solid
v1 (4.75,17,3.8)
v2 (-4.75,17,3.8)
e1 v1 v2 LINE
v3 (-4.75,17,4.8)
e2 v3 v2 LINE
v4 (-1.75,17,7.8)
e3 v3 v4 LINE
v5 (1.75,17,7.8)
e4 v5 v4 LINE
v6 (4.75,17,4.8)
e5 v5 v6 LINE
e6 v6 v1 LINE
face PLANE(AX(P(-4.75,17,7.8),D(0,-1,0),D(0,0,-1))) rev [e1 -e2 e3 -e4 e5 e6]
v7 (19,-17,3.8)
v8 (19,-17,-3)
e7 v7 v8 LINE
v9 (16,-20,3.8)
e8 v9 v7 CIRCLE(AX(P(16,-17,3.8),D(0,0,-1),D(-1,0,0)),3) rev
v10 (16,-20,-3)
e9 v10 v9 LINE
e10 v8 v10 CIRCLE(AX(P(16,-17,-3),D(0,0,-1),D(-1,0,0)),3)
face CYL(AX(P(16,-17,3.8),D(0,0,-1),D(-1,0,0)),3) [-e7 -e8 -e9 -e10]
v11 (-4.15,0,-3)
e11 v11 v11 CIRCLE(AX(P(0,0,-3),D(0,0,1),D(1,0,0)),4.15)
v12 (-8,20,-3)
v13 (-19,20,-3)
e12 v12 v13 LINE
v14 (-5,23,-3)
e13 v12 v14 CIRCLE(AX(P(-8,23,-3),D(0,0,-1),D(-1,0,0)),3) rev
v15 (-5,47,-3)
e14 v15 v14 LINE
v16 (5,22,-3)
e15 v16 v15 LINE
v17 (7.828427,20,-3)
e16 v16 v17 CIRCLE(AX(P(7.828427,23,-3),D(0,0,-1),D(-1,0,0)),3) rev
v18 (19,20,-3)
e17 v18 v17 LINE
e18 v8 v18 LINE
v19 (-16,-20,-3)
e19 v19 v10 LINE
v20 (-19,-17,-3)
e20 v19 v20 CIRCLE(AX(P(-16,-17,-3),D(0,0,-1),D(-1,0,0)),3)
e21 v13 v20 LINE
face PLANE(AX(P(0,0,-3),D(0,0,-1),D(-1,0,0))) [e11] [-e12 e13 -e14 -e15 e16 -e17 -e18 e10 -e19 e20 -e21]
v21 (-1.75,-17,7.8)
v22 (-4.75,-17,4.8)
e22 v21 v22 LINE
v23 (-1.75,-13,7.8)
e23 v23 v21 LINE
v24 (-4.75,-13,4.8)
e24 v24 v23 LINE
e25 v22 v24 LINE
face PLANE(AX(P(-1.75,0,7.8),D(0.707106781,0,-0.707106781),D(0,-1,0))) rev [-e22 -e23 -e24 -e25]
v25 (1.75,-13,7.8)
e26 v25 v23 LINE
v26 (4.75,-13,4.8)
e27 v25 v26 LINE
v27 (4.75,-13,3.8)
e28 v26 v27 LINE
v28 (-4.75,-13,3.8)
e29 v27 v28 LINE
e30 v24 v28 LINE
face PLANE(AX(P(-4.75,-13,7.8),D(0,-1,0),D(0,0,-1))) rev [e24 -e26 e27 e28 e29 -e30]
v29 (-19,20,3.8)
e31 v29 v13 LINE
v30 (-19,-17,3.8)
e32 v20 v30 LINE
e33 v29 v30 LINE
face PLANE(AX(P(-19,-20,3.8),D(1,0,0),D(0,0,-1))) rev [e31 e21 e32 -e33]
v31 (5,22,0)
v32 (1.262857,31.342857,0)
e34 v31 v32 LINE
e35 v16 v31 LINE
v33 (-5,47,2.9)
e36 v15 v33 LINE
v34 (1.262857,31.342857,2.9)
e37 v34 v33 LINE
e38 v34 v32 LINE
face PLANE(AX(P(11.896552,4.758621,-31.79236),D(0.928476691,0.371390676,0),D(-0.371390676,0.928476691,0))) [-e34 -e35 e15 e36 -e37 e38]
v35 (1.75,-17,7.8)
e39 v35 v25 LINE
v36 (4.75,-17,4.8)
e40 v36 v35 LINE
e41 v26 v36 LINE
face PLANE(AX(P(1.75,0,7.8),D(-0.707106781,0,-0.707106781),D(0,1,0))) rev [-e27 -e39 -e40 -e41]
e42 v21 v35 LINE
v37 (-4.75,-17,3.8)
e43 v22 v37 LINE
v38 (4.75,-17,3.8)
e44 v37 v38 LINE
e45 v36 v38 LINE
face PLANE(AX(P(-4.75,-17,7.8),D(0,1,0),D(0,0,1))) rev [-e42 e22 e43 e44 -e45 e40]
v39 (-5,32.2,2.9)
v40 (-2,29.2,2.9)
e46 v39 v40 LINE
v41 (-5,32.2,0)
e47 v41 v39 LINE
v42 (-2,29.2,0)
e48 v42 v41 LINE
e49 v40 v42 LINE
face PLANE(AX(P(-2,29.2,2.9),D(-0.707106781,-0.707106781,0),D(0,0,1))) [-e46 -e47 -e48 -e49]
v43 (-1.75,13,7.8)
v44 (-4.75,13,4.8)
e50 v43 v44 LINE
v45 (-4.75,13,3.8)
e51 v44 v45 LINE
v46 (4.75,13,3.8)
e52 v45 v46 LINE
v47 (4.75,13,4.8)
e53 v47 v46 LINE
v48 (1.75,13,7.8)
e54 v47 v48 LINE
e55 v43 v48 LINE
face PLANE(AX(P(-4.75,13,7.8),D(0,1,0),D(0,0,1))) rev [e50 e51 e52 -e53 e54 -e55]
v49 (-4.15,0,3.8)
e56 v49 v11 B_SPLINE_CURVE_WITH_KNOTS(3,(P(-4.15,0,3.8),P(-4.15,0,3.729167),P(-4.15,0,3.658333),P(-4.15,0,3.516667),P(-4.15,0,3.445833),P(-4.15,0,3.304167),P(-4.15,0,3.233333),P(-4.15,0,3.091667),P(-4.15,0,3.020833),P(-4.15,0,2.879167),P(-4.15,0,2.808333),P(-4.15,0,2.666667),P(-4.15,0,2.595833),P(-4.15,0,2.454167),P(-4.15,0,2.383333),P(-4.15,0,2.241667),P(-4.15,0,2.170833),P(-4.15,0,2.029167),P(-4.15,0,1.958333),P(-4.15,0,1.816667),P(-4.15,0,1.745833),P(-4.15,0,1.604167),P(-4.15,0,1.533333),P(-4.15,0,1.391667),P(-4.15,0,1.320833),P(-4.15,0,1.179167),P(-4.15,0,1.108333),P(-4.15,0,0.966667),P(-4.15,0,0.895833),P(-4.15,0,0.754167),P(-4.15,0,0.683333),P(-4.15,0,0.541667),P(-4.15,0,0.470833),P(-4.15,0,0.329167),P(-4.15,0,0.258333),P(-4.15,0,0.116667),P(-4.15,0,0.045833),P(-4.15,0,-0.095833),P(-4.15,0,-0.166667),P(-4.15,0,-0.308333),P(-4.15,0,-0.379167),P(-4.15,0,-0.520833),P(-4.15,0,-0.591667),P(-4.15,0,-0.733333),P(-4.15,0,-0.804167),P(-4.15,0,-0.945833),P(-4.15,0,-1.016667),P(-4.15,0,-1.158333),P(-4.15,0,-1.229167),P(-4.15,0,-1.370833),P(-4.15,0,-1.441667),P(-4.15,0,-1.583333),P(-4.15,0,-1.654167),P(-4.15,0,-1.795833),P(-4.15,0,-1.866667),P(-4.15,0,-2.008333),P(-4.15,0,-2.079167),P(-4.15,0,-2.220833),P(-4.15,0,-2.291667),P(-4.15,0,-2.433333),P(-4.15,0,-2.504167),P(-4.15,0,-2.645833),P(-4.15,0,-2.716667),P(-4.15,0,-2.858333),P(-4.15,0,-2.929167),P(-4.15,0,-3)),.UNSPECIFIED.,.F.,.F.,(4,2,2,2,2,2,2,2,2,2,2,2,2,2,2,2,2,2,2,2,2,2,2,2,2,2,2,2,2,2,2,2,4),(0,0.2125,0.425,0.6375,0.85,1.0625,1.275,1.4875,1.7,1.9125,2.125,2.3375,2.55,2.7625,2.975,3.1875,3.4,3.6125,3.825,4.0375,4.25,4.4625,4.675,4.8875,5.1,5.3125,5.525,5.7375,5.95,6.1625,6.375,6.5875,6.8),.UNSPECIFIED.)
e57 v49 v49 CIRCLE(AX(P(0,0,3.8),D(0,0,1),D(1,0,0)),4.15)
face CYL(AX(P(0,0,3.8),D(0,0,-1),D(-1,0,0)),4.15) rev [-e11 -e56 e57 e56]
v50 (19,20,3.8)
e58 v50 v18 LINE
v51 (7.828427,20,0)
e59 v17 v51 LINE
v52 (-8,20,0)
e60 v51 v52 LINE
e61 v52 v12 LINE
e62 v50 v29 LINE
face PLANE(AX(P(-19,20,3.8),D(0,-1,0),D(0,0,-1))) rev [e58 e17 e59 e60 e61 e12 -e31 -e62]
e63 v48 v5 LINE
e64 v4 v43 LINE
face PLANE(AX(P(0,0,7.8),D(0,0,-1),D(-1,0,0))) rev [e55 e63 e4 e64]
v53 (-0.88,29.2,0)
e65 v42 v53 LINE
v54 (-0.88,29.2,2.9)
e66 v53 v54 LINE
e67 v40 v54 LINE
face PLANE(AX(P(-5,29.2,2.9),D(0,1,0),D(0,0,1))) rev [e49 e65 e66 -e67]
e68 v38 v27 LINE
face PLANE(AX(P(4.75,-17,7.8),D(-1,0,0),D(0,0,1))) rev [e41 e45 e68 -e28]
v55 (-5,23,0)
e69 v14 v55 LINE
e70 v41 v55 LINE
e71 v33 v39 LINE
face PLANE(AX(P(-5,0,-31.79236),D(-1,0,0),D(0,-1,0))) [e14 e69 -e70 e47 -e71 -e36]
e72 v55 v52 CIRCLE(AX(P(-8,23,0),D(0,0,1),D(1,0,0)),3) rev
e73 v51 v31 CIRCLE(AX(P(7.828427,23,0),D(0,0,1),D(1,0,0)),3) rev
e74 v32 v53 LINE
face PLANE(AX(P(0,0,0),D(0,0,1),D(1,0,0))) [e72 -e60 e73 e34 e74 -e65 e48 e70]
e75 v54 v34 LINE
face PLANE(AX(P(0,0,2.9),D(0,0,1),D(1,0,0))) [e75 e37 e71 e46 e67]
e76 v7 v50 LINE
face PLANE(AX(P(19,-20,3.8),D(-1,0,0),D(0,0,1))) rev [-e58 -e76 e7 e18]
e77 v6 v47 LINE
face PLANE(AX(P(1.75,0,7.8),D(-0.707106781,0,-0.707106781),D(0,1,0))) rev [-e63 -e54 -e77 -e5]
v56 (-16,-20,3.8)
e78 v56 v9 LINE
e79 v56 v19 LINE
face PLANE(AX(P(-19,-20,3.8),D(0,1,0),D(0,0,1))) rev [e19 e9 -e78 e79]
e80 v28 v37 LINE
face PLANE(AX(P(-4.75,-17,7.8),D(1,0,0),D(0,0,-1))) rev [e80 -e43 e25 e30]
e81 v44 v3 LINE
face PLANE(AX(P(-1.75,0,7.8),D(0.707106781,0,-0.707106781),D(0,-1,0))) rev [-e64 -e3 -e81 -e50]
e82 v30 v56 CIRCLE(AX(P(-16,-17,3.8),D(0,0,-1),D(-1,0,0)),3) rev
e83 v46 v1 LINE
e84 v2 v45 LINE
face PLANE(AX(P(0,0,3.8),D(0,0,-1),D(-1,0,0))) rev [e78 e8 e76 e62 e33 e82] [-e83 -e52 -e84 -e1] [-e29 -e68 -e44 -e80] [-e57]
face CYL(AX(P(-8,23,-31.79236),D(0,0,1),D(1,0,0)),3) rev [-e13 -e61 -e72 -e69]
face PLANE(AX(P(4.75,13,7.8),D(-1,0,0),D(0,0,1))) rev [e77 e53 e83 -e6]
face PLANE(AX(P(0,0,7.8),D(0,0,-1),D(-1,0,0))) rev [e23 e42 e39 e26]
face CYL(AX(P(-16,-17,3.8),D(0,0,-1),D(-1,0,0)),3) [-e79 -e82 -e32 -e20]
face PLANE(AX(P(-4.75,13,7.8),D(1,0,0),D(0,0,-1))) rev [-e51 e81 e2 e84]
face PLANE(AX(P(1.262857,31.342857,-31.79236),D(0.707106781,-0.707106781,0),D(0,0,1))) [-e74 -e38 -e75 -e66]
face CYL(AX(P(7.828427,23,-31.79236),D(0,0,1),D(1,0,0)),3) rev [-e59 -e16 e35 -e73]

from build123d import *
from OCP.BRepFilletAPI import BRepFilletAPI_MakeChamfer

# Parameters (mm, degrees)
BOSS_EXTRUDE1_DEPTH      = 3.8
BOSS_EXTRUDE1_DEPTH_BACK = 3
SKETCH1_W                = 38
SKETCH1_H                = 40
SKETCH1_R                = 4.15
BOSS_EXTRUDE2_DEPTH      = 3
FILLET1_R                = 3
SKETCH3_W                = 9.5
SKETCH3_H                = 4
BOSS_EXTRUDE3_DEPTH      = 4
BOSS_EXTRUDE4_DEPTH      = 2.9
CHAMFER1_SIZE            = 3
CHAMFER1_SIZE2           = 2.307927774


with BuildPart() as part:
    # Sketch1 → Boss-Extrude1 (new, two sides: drawn at the far end of the back side and taken through both)
    with BuildSketch(Plane.XY.offset(-BOSS_EXTRUDE1_DEPTH_BACK)):
        Rectangle(SKETCH1_W, SKETCH1_H)
        with Locations(Location((0, 0, 0), (0, 0, 180))):
            Circle(SKETCH1_R, mode=Mode.SUBTRACT)
    extrude(amount=BOSS_EXTRUDE1_DEPTH + BOSS_EXTRUDE1_DEPTH_BACK)

    # Sketch2 → Boss-Extrude2 (add)
    with BuildSketch(Plane.XY):
        Polygon((5, 20), (5, 22), (-5, 47), (-5, 20), align=None)
    extrude(amount=-BOSS_EXTRUDE2_DEPTH)

    # Fillet1
    # the kernel refuses this fillet: 3 mm, written as the material it adds along each edge
    with BuildSketch(Plane(origin=(-5, 20, 0), x_dir=(-1, 0, 0), z_dir=(0, 0, -1))) as fillet1_piece_1:
        with BuildLine():
            CenterArc((FILLET1_R, FILLET1_R), FILLET1_R, 180, 90)
            Line((0, FILLET1_R), (0, 0))
            Line((0, 0), (FILLET1_R, 0))
        make_face()
    extrude(amount=3)
    with BuildSketch(Plane(origin=(5, 20, 0), x_dir=(1, 0, 0), z_dir=(0, 0, -1))) as fillet1_piece_2:
        with BuildLine():
            CenterArc((2.828427125, -3), FILLET1_R, 90, 70.528779366)
            Line((0, -2), (0, 0))
            Line((0, 0), (2.828427125, 0))
        make_face()
    extrude(amount=3)
    # the kernel refuses this fillet: 3 mm, written as the material it takes off along each edge
    with BuildSketch(Plane(origin=(19, -20, -10.5), x_dir=(-1, 0, 0), z_dir=(0, 0, 1)), Plane(origin=(-19, -20, 11.3), x_dir=(1, 0, 0), z_dir=(0, 0, -1))) as fillet1_2_piece_1:
        with BuildLine():
            CenterArc((FILLET1_R, -FILLET1_R), FILLET1_R, 90, 90)
            Line((0, -FILLET1_R), (0, 0))
            Line((0, 0), (FILLET1_R, 0))
        make_face()
    extrude(amount=21.8, mode=Mode.SUBTRACT)

    # Sketch3 → Boss-Extrude3 (add)
    with BuildSketch(Plane.XY.offset(3.8)):
        with Locations((0, -15)):
            Rectangle(SKETCH3_W, SKETCH3_H)
        with Locations((0, 15)):
            Rectangle(SKETCH3_W, SKETCH3_H)
    extrude(amount=BOSS_EXTRUDE3_DEPTH)

    # Sketch4 → Boss-Extrude4 (add)
    with BuildSketch(Plane.XY):
        Polygon((-5, 29.2), (2.12, 29.2), (-5, 47), align=None)
    extrude(amount=BOSS_EXTRUDE4_DEPTH)

    # Chamfer1: one chamfer whose edges measure the first distance from different faces: ONE call of the kernel's chamfer builder (chamfer() names one face for all edges)
    chamfer1_edges_1 = [part.edges().sort_by_distance(p)[0] for p in [
        (-5, 29.2, 1.45),
        (4.75, 15, 7.8),
        (-4.75, 15, 7.8),
        (4.75, -15, 7.8),
        (-4.75, -15, 7.8),
    ]]
    chamfer1_edges_2 = [part.edges().sort_by_distance(p)[0] for p in [
        (2.12, 29.2, 1.45),
    ]]
    chamfer1_side_2 = [part.faces().sort_by_distance(p)[0] for p in [
        (-1.44, 29.2, 1.45),
    ]]
    chamfer1 = BRepFilletAPI_MakeChamfer(part.part.solid().wrapped)
    for e in chamfer1_edges_1:
        chamfer1.Add(CHAMFER1_SIZE, e.wrapped)
    for e in chamfer1_edges_2:
        chamfer1.Add(CHAMFER1_SIZE, CHAMFER1_SIZE2, e.wrapped, chamfer1_side_2[0].wrapped)  # the first distance lies on this face
    add(Compound.cast(chamfer1.Shape()), mode=Mode.REPLACE)


solid = part.part
